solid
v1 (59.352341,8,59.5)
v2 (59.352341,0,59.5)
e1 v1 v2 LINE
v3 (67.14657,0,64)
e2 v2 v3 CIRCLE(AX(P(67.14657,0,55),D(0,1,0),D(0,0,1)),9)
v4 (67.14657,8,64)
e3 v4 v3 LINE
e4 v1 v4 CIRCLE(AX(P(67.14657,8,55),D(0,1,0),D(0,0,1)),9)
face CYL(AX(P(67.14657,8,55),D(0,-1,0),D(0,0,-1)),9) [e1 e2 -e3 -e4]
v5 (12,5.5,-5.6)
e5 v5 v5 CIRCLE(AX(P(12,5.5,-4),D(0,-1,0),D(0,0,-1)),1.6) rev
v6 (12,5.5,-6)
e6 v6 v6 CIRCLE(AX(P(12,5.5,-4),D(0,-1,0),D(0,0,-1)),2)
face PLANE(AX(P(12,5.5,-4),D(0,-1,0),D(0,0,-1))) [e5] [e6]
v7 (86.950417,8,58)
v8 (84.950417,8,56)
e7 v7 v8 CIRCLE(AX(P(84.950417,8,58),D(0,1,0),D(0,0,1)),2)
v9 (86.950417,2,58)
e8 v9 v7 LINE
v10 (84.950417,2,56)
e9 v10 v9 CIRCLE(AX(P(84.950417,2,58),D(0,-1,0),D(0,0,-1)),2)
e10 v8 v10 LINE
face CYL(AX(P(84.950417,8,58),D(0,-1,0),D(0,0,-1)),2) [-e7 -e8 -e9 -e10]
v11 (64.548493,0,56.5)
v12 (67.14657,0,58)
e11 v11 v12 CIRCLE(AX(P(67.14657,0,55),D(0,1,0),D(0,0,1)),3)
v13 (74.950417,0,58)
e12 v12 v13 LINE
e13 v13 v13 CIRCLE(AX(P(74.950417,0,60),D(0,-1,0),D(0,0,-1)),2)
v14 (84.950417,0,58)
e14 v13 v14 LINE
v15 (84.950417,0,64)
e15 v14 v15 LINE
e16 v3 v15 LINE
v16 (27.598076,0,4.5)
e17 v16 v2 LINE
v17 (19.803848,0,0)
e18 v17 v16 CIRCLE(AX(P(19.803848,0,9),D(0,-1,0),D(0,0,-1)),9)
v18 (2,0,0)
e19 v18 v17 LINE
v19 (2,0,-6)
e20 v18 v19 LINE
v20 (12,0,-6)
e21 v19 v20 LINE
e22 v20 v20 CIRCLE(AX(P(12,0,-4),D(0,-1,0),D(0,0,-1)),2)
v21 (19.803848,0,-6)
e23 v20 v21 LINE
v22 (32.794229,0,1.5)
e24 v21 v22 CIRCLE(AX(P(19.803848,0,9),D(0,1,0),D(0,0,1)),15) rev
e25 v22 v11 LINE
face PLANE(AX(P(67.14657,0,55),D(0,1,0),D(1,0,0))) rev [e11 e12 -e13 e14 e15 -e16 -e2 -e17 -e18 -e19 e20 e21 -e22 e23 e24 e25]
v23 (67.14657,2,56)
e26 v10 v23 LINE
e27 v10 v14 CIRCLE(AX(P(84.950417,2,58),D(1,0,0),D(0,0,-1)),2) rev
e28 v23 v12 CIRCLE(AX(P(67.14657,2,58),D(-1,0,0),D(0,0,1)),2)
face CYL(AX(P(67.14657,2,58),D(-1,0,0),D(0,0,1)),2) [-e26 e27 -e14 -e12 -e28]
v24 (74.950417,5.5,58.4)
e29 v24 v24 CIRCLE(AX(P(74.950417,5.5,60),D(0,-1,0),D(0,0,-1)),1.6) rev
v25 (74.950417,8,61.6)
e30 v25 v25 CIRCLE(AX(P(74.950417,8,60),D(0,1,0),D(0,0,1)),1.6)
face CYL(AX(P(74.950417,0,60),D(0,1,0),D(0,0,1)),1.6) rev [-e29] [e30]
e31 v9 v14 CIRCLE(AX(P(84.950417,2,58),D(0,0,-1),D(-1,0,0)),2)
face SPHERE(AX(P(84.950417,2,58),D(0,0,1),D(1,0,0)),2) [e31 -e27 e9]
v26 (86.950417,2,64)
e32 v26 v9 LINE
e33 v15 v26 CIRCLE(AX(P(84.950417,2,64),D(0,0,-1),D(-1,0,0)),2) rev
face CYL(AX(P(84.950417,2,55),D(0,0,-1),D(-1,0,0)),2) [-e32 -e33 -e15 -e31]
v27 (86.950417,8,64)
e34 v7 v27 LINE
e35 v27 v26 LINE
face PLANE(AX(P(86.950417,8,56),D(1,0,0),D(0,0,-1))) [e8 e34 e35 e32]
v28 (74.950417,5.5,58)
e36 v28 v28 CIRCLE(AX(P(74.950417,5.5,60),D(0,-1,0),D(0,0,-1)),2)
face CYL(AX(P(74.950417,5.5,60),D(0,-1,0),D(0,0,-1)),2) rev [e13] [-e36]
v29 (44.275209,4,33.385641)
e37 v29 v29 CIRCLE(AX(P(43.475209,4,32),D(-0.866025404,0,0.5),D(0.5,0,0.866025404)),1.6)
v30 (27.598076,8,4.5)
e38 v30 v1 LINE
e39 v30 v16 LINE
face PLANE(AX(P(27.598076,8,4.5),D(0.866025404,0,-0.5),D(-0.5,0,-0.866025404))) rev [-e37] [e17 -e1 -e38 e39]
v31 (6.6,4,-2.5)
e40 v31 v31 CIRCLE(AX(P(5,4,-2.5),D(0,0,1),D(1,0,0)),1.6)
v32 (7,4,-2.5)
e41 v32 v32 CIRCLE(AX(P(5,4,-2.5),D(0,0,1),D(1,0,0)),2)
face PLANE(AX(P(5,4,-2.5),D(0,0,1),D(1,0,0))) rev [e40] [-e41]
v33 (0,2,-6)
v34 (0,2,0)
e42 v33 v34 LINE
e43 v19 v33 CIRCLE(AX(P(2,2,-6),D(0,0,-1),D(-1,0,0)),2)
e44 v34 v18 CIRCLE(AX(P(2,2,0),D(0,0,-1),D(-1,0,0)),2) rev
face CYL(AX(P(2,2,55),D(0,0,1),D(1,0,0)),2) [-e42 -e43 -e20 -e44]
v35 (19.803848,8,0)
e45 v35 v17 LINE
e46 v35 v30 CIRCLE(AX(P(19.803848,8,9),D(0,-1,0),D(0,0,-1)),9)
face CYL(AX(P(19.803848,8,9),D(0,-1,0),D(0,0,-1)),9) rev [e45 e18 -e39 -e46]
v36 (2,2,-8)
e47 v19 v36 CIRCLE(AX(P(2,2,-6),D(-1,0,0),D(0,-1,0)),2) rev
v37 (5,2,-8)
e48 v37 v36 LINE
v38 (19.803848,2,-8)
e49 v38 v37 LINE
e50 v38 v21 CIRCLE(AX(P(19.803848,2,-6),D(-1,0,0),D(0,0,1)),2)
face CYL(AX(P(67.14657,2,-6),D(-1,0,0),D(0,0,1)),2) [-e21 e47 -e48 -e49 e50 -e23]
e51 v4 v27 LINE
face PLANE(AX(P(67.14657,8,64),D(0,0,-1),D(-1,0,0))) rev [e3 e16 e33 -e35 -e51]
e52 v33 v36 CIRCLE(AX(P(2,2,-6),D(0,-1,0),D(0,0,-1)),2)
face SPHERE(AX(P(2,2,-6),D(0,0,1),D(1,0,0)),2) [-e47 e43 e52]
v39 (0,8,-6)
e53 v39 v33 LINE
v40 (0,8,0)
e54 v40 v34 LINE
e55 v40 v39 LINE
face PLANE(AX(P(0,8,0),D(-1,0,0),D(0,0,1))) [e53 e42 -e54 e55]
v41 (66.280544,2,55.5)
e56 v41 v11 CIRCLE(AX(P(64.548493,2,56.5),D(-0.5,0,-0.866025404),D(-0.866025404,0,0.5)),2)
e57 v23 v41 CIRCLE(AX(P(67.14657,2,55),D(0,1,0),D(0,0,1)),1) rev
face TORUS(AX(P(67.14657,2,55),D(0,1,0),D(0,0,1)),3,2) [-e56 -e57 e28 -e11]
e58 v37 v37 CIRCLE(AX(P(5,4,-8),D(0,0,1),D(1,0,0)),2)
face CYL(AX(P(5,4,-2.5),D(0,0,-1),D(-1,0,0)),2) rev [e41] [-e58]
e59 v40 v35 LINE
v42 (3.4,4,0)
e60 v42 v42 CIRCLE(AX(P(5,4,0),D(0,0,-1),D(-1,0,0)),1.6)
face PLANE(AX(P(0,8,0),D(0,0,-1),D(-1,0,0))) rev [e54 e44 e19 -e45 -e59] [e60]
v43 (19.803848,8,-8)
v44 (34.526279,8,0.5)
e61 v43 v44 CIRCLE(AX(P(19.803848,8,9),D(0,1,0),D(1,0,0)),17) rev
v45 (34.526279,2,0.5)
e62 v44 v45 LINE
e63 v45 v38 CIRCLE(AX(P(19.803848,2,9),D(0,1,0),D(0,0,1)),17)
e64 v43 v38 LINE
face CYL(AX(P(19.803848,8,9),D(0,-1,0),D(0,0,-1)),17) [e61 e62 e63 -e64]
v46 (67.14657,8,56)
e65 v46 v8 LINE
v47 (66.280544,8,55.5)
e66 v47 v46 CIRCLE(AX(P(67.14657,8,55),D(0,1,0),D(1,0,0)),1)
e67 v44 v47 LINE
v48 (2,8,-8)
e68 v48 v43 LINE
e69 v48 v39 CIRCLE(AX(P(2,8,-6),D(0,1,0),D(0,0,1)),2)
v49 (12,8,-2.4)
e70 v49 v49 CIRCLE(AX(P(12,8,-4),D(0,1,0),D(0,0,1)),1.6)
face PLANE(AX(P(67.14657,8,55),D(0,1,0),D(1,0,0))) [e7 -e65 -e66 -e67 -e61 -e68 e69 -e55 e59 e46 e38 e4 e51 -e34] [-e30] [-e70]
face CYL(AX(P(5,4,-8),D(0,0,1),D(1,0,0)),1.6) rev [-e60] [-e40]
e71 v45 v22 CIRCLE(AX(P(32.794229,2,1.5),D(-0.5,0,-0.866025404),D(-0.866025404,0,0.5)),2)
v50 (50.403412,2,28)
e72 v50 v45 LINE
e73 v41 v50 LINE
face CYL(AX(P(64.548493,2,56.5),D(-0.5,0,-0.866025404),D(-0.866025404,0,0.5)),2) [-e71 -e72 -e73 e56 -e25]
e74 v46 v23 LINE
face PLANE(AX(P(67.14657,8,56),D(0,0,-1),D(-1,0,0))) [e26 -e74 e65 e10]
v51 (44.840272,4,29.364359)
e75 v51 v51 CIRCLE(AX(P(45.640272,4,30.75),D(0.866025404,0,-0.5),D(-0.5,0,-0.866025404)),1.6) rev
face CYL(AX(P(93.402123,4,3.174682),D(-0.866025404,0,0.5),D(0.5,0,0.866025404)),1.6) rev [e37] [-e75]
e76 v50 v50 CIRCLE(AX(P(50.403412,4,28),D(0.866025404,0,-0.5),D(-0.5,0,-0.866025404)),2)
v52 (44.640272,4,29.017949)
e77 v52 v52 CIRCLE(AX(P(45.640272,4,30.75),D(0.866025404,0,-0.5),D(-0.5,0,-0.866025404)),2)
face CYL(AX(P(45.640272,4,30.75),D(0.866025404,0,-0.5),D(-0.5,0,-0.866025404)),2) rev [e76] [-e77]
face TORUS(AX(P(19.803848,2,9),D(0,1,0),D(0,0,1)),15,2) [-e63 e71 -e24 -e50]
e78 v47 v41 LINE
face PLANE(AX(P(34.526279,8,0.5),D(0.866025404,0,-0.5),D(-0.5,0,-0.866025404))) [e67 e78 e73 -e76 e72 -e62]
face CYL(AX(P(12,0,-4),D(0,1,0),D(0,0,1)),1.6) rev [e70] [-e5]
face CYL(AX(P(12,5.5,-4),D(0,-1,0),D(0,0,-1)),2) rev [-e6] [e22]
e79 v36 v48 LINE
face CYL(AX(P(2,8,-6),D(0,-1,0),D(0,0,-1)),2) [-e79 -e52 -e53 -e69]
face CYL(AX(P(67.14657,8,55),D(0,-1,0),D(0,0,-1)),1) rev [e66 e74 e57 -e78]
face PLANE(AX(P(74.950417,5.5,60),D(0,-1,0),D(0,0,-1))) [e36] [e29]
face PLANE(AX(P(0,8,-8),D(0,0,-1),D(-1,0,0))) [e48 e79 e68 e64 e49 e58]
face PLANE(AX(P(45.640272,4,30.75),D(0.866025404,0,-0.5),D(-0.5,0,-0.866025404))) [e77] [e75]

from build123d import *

# Parameters (mm, degrees)
EXTRU_MINCE1_DEPTH      = 8
ESQUISSE2_R             = 1.6
ENL_V_MAT_EXTRU_1_DEPTH = 109.260681026
ESQUISSE3_R             = 2
ENL_V_MAT_EXTRU_2_DEPTH = 5.5
ESQUISSE4_R             = 1.6
ENL_V_MAT_EXTRU_3_DEPTH = 109.260681026
ESQUISSE5_R             = 2
ENL_V_MAT_EXTRU_4_DEPTH = 5.5
ESQUISSE7_R             = 1.6
ENL_V_MAT_EXTRU_5_DEPTH = 102.558480966
ESQUISSE8_R             = 2
ENL_V_MAT_EXTRU_6_DEPTH = 5.5
CONG_1_R                = 2


with BuildPart() as part:
    # Esquisse1 → Extru.-Mince1 (new body)
    with BuildSketch(Plane(origin=(0, 0, 0), x_dir=(1, 0, 0), z_dir=(0, 1, 0))):
        with BuildLine():
            Line((0, 0), (19.803847577, 0))
            ThreePointArc((19.803847577, 0), (24.303847577, -1.205771366), (27.598076211, -4.5))
            Line((27.598076211, -4.5), (59.352341017, -59.5))
            ThreePointArc((59.352341017, -59.5), (62.646569651, -62.794228634), (67.146569651, -64))
            Line((67.146569651, -64), (86.950417228, -64))
            Line((86.950417228, -64), (86.950417228, -56))
            Line((86.950417228, -56), (67.146569651, -56))
            ThreePointArc((67.146569651, -56), (66.646569651, -55.866025404), (66.280544247, -55.5))
            Line((66.280544247, -55.5), (34.526279442, -0.5))
            ThreePointArc((34.526279442, -0.5), (28.303847577, 5.722431864), (19.803847577, 8))
            Line((19.803847577, 8), (0, 8))
            Line((0, 8), (0, 0))
        make_face()
    extrude(amount=EXTRU_MINCE1_DEPTH)

    # Esquisse2 → Enlèv. mat.-Extru.1 (cut, through all)
    with BuildSketch(Plane(origin=(0, 8, 0), x_dir=(1, 0, 0), z_dir=(0, 1, 0))):
        with Locations(Location((74.950417228, -60, 0), (0, 0, 270))):
            Circle(ESQUISSE2_R)
        with Locations(Location((12, 4, 0), (0, 0, 270))):
            Circle(ESQUISSE2_R)
    extrude(amount=-ENL_V_MAT_EXTRU_1_DEPTH, mode=Mode.SUBTRACT)

    # Esquisse3 → Enlèv. mat.-Extru.2 (cut)
    with BuildSketch(Plane.XZ):
        with Locations(Location((74.950417228, 60, 0), (0, 0, 270))):
            Circle(ESQUISSE3_R)
        with Locations(Location((12, -4, 0), (0, 0, 270))):
            Circle(ESQUISSE3_R)
    extrude(amount=-ENL_V_MAT_EXTRU_2_DEPTH, mode=Mode.SUBTRACT)

    # Esquisse4 → Enlèv. mat.-Extru.3 (cut, through all)
    with BuildSketch(Plane(origin=(0, 0, 0), x_dir=(-1, 0, 0), z_dir=(0, 0, -1))):
        with Locations((-5, 4)):
            Circle(ESQUISSE4_R)
    extrude(amount=ENL_V_MAT_EXTRU_3_DEPTH, mode=Mode.SUBTRACT)

    # Esquisse5 → Enlèv. mat.-Extru.4 (cut)
    with BuildSketch(Plane.XY.offset(-8)):
        with Locations((5, 4)):
            Circle(ESQUISSE5_R)
    extrude(amount=ENL_V_MAT_EXTRU_4_DEPTH, mode=Mode.SUBTRACT)

    # Esquisse7 → Enlèv. mat.-Extru.5 (cut, through all)
    with BuildSketch(Plane(origin=(18.75, 0, -10.825317547), x_dir=(0.499999999999998, 0, 0.8660254037844398), z_dir=(-0.8660254037844399, 0, 0.49999999999999806))):
        with Locations((49.450417228, 4)):
            Circle(ESQUISSE7_R)
    extrude(amount=-ENL_V_MAT_EXTRU_5_DEPTH, mode=Mode.SUBTRACT)

    # Esquisse8 → Enlèv. mat.-Extru.6 (cut)
    with BuildSketch(Plane(origin=(25.67820323, 0, -14.825317547), x_dir=(-0.49999999999999806, 0, -0.8660254037844398), z_dir=(0.8660254037844397, 0, -0.499999999999998))):
        with Locations((-49.450417228, 4)):
            Circle(ESQUISSE8_R)
    extrude(amount=-ENL_V_MAT_EXTRU_6_DEPTH, mode=Mode.SUBTRACT)

    # Congé1
    cong_1_edges = [part.edges().sort_by_distance(p)[0] for p in [
        (0, 0, -4),
        (9.901923789, 0, -8),
        (28.303847577, 0, -5.722431864),
        (50.403411844, 0, 28),
        (66.646569651, 0, 55.866025404),
        (77.048493439, 0, 56),
        (86.950417228, 0, 60),
        (0, 4, -8),
        (86.950417228, 4, 56),
    ]]
    fillet(cong_1_edges, radius=CONG_1_R - 0.0001)  # a hair under: the kernel refuses the full size


solid = part.part
